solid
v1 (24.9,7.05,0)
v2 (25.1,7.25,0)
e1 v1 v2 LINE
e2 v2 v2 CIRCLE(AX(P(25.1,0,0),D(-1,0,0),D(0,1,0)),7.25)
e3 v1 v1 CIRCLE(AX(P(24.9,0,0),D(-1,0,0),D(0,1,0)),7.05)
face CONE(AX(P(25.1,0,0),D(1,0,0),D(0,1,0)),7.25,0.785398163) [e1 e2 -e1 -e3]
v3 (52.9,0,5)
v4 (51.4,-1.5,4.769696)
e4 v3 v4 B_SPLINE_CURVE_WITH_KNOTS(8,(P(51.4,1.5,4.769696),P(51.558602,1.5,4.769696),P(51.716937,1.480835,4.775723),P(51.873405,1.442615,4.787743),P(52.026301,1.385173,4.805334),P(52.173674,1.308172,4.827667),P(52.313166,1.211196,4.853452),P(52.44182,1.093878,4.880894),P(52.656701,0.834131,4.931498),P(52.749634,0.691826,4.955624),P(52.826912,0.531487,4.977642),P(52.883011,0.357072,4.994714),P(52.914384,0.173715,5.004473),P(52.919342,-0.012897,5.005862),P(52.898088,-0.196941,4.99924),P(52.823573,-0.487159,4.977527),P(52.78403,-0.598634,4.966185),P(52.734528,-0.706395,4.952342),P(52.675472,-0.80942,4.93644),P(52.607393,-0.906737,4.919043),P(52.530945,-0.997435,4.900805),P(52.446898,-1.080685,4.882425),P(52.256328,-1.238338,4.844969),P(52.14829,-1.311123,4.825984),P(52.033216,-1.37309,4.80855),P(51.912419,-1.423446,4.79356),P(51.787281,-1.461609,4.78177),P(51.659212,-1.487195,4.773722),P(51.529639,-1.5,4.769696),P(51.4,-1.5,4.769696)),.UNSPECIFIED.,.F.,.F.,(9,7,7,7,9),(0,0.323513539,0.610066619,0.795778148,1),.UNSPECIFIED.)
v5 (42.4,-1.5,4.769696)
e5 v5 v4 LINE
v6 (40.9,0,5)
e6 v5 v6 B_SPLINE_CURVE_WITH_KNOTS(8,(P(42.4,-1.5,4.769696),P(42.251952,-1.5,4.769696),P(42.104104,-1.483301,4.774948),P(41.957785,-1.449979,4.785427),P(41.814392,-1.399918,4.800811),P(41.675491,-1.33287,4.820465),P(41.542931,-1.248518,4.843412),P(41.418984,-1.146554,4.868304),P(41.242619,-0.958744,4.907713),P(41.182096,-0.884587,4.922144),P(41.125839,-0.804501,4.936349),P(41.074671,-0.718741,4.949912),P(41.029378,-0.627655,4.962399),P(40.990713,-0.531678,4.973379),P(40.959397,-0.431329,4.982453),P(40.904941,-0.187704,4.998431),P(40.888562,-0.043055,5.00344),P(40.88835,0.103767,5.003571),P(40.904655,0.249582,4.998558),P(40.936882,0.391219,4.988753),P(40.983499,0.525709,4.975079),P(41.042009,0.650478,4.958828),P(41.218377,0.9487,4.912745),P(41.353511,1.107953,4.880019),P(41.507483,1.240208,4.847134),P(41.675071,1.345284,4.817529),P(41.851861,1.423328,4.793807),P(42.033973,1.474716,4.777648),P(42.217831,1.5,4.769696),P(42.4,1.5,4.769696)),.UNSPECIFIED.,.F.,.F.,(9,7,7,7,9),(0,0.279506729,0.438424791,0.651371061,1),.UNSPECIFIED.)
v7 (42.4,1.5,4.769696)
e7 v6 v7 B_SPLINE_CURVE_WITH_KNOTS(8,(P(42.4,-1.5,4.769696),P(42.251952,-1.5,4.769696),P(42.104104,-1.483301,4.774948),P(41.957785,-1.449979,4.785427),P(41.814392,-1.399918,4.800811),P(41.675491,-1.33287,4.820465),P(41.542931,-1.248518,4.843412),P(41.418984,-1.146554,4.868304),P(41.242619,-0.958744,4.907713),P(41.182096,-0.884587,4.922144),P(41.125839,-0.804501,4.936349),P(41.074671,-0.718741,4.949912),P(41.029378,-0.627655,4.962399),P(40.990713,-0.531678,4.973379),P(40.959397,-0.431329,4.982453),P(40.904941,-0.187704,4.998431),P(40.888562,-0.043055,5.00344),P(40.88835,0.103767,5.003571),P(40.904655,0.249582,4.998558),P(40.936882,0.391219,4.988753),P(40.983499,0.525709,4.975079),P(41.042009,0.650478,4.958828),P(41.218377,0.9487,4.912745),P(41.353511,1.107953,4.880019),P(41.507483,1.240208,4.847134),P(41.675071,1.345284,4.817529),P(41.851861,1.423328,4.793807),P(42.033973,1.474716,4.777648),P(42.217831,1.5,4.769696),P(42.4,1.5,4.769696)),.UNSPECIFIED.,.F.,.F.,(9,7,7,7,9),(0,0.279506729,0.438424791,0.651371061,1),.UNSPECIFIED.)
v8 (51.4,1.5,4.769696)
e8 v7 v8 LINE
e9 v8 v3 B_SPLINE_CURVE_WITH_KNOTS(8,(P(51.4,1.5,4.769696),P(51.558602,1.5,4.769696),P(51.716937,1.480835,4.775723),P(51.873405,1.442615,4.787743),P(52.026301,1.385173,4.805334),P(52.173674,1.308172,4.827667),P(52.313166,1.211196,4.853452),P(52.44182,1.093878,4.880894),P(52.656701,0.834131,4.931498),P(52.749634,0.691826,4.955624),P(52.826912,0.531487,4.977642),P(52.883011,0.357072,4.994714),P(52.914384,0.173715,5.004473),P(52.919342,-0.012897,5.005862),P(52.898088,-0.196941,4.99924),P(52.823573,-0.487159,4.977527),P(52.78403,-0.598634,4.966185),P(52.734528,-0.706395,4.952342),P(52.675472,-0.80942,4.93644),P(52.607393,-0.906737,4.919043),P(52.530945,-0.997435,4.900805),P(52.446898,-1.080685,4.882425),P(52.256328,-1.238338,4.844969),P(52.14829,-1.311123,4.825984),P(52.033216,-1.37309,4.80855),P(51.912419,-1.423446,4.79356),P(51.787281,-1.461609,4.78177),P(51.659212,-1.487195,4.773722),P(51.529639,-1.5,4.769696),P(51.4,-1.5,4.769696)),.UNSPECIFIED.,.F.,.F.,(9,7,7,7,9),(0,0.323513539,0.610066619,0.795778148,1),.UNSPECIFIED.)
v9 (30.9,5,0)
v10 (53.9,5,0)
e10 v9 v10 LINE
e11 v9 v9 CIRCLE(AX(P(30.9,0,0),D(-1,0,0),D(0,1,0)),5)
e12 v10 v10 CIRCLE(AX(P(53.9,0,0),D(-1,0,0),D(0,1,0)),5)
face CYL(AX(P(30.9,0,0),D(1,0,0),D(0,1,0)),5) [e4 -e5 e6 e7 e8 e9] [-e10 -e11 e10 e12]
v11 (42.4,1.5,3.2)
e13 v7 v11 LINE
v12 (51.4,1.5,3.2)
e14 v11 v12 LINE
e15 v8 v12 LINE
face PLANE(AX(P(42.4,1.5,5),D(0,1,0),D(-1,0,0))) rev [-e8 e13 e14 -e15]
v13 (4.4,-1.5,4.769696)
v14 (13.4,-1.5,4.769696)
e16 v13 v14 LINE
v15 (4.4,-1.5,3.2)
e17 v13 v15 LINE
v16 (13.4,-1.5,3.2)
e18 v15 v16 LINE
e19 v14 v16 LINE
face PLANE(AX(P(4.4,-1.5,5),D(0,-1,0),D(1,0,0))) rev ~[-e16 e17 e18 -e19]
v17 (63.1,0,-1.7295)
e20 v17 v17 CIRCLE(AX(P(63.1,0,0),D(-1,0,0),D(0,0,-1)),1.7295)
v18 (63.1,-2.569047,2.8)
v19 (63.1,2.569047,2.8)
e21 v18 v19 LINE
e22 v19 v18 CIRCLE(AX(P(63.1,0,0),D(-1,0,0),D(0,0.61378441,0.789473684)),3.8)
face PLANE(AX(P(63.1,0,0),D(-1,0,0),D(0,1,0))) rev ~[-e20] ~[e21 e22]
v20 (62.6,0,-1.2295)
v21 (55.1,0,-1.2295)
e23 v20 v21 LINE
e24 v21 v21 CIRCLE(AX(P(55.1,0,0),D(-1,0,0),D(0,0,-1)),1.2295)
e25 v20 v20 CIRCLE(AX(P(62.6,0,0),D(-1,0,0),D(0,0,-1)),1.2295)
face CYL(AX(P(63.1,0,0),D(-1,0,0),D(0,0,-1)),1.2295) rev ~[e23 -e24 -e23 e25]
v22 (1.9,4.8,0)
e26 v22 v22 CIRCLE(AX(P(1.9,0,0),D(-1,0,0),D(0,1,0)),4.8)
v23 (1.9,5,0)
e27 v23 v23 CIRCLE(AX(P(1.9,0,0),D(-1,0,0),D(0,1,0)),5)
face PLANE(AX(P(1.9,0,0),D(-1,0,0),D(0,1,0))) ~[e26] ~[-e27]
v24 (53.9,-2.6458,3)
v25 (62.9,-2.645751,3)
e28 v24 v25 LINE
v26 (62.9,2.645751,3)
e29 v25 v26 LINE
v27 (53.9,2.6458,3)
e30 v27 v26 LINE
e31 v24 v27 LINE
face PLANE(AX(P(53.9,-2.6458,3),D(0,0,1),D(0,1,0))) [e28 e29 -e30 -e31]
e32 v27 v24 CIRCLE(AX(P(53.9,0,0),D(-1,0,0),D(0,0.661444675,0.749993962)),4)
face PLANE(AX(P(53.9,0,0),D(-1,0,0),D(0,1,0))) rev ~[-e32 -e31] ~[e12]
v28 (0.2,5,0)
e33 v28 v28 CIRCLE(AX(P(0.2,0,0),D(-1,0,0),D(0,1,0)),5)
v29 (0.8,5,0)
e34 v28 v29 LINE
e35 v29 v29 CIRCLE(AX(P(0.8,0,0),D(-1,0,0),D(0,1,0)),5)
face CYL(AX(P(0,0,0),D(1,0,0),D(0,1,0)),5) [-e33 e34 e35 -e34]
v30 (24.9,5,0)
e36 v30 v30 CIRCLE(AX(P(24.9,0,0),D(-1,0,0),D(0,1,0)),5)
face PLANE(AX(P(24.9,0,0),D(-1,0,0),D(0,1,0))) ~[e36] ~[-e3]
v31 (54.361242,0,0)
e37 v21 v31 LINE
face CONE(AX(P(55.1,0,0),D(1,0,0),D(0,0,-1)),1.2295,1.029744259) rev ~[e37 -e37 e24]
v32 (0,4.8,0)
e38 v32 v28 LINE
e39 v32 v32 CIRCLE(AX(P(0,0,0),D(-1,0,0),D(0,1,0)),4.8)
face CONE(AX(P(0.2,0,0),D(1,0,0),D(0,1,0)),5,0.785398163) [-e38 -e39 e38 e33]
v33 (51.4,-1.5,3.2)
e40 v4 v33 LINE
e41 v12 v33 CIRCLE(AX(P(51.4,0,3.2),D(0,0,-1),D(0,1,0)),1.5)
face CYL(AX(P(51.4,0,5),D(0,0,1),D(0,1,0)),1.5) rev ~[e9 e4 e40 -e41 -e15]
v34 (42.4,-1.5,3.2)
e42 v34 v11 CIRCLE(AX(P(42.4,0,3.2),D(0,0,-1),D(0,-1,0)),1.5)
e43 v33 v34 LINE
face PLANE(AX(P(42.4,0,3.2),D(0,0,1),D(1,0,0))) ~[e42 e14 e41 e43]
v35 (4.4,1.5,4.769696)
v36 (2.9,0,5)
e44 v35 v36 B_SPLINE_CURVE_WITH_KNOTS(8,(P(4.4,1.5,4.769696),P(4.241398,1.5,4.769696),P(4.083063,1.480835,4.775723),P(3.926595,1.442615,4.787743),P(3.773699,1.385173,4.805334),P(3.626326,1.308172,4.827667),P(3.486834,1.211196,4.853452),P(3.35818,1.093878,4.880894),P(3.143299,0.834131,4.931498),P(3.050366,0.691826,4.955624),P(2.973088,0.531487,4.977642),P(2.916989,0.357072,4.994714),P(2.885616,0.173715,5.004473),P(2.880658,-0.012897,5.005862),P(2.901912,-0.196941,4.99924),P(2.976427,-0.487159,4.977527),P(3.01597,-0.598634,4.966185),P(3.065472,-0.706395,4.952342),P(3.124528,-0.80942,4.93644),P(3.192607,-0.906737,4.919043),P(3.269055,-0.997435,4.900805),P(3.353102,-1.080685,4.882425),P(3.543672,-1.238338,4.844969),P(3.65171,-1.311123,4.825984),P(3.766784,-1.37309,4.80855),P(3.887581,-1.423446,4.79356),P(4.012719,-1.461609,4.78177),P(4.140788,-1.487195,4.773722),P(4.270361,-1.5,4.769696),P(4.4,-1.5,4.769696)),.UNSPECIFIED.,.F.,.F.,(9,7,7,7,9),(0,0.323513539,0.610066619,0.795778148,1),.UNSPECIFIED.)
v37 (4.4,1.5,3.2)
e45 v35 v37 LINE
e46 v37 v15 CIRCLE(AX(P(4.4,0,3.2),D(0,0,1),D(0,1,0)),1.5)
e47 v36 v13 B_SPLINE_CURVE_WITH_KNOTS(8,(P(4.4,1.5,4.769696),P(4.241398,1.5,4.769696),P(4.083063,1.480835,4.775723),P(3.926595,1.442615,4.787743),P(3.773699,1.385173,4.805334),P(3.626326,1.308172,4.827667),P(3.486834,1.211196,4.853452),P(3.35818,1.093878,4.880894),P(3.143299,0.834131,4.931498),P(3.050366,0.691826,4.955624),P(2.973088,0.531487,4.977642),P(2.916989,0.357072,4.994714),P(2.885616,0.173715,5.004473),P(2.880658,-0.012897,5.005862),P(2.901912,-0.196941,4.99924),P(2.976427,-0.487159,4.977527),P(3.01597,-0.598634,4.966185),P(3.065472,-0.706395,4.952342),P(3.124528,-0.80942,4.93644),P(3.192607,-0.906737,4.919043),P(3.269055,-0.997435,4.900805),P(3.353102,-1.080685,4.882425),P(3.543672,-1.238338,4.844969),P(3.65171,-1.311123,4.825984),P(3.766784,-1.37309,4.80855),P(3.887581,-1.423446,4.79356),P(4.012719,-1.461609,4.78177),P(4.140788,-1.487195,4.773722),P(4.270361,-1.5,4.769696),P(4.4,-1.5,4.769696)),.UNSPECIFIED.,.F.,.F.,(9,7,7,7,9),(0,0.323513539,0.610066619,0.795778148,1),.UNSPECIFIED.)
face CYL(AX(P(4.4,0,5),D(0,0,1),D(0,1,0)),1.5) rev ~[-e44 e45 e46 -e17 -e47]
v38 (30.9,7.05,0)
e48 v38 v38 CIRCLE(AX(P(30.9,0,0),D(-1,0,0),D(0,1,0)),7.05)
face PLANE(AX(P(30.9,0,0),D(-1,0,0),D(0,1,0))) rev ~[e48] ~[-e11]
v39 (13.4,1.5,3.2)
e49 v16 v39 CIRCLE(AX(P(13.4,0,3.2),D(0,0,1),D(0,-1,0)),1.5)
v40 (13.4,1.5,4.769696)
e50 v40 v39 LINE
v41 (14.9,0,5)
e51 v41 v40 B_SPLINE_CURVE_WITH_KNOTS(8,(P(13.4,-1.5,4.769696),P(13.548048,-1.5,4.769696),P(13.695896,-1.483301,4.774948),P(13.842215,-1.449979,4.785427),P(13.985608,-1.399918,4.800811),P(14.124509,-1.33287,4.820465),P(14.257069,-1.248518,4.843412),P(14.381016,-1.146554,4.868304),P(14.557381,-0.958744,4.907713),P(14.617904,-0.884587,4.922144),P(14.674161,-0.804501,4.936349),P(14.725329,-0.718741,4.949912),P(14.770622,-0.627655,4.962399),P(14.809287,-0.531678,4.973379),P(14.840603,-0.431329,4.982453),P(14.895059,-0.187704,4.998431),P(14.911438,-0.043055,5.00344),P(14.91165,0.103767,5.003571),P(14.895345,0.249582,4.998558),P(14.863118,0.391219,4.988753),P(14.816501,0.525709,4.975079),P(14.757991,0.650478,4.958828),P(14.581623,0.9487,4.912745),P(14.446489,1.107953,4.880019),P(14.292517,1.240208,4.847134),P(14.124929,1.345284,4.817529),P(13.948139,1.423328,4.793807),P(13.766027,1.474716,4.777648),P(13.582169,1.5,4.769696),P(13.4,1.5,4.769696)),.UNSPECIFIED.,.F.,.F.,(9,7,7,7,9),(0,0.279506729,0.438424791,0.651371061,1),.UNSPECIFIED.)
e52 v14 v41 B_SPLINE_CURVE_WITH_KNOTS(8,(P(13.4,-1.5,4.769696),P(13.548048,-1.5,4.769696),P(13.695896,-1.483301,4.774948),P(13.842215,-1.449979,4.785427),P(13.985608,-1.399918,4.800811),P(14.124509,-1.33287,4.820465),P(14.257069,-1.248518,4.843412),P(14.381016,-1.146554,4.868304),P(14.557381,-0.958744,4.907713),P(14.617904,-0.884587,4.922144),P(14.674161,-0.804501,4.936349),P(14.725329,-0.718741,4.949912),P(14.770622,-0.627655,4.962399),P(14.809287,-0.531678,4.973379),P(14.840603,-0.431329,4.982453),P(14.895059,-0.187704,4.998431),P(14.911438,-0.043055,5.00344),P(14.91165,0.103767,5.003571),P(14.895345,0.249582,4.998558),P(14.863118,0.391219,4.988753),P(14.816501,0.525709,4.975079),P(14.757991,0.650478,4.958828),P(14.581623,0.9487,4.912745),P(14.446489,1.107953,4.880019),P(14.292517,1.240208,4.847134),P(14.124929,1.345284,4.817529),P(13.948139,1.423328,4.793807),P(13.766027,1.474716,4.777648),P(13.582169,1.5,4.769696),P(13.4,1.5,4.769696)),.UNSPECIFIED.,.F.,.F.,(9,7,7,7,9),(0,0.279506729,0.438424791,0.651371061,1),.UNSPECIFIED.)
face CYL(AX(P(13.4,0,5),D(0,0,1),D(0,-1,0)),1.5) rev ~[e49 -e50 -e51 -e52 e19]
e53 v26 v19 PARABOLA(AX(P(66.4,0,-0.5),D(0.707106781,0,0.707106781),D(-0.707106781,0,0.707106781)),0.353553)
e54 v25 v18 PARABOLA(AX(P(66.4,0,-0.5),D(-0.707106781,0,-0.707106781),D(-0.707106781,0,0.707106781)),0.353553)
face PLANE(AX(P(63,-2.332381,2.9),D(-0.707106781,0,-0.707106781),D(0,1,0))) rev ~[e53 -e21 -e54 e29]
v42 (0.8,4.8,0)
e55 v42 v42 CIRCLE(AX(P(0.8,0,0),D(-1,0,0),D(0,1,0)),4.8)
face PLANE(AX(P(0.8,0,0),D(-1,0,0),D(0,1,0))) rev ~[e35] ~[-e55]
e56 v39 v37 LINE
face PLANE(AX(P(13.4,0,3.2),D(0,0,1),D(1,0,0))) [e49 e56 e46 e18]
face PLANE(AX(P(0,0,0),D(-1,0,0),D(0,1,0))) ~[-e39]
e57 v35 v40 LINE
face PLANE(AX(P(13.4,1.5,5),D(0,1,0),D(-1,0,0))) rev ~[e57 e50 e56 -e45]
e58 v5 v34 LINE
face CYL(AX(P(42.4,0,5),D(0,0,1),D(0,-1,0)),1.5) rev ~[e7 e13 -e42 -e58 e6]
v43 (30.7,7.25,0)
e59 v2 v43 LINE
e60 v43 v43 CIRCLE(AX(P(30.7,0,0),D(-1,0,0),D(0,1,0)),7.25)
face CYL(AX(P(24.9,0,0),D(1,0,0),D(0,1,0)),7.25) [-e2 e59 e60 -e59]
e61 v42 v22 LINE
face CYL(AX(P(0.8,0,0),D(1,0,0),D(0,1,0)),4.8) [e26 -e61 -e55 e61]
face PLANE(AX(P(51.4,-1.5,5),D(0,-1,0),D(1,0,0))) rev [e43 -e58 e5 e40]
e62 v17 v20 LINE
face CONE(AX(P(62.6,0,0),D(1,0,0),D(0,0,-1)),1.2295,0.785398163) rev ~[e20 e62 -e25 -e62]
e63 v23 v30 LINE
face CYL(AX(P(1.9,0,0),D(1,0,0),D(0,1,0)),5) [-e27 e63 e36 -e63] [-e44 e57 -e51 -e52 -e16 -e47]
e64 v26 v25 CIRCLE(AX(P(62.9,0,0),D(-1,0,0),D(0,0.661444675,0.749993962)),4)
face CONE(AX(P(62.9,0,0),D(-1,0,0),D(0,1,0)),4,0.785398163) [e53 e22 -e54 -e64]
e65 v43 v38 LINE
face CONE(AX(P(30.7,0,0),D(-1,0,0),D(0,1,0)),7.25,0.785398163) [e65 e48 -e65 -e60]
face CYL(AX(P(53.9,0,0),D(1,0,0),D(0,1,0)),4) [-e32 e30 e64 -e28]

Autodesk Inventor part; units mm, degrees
ref_plane "YZ Plane" through (0, 0, 0) normal (1, 0, 0) x (0, 1, 0)
ref_plane "XZ Plane" through (0, 0, 0) normal (0, 1, 0) x (-1, 0, 0)
sketch "Skizze1" plane through (0, 0, 0) normal (0, 0, 1) x (1, 0, 0)
  line L0 (0, 0) -> (0, 5)
  line L1 (0, 5) -> (0.8, 5)
  line L2 (0.8, 5) -> (0.8, 4.8)
  line L3 (0.8, 4.8) -> (1.9, 4.8)
  line L4 (1.9, 4.8) -> (1.9, 5)
  line L5 (1.9, 5) -> (24.9, 5)
  line L6 (24.9, 5) -> (24.9, 7.25)
  line L7 (24.9, 7.25) -> (30.9, 7.25)
  line L8 (30.9, 7.25) -> (30.9, 5)
  line L9 (30.9, 5) -> (53.9, 5)
  line L10 (53.9, 5) -> (53.9, 4)
  line L11 (53.9, 4) -> (63.1, 4)
  line L12 (63.1, 4) -> (63.1, 0)
  line L13 (63.1, 0) -> (0, 0)
  line L14 (15.9, 5) -> (15.9, 0) construction
  line L15 (39.9, 5) -> (39.9, 0) construction
  line L16 (9.9, 5) -> (9.9, 0) construction
  line L17 (45.9, 5) -> (45.9, 0) construction
  line L18 (53.9, 5) -> (53.9, 0) construction
  dimension "d0" = 10
  dimension "d2" = 14.5
  dimension "d3" = 1.1
  dimension "d4" = 9.6
  dimension "d5" = 0.8
  dimension "d7" = 9
  dimension "d8" = 9
  dimension "d9" = 6
  dimension "d10" = 14
  dimension "d11" = 14
  dimension "ParrallelMecha_DrivenLink_OuterWidth" = 52
  dimension "d22" = 6
  dimension "d23" = 6
  dimension "Querstrebe_Length" = 36
  dimension "d25" = 9.2
  dimension "d26" = 8
revolve "Umdrehung1" add sketch "Skizze1" angle 360 about axis through (63.1, 0, 0) along (-1, 0, 0)
chamfer "Fase1" distance 0.2 angle 45 4 edges at (24.9, -7.25, 0) (30.9, -7.25, 0) (63.1, -4, 0) (0, -5, 0)
ref_plane "Wellennut_Spiegelebene" through (27.9, 0, 0) normal (-1, 0, 0) x (0, 0, 1)
ref_plane "Arbeitsebene2" through (13.4, 0, 5) normal (0, 0, 1) x (1, 0, 0)
sketch "Skizze3" plane through (13.4, 0, 5) normal (0, 0, 1) x (1, 0, 0)
  line L0 (2.5, 5) -> (2.5, 0) construction
  line L1 (-26.02, 0) -> (62.32, 0) construction
  line L2 (0, 0) -> (-9, 0) construction
  line L3 (0, 1.5) -> (-9, 1.5)
  line L4 (-9, -1.5) -> (0, -1.5)
  arc A0 (0, -1.5) -> (0, 1.5) centre (0, 0) ccw
  arc A1 (-9, 1.5) -> (-9, -1.5) centre (-9, 0) ccw
  line L5 (-11.5, 0) -> (2.5, 0) construction
  line L6 (-11.5, -5) -> (-11.5, 5) construction
  point P0 (-13.4, 0)
  point P1 (-4.5, 0)
  point P2 (-4.5, 0)
  dimension "d17" = 3
  dimension "d18" = 12
extrude "Wellennut" cut sketch "Skizze3" against normal blind 1.8
mirror "Spiegeln1" about plane through (27.9, 0, 0) normal (-1, 0, 0) of "Wellennut"
sketch "Skizze4" plane through (53.9, 0, 0) normal (1, 0, 0) x (0, 0, -1)
  circle A0 centre (0, 0) radius 4 projected
  line L0 (-3, -2.6458) -> (-3, 2.6458)
  point P0 (0, 0)
  dimension "d27" = 3
extrude "Extrusion2" cut sketch "Skizze4" along normal through all contours L0 A0 picked at (-3.1815, -0.6179)
chamfer "Fase2" distance 0.2 angle 45 1 edges at (63.1, 0, 3)
sketch "Skizze5" plane through (63.1, 0, 0) normal (1, 0, 0) x (0, 0, -1)
  arc A0 (-3, -2.6458) -> (-3, 2.6458) centre (0, 0) ccw construction
  circle A1 centre (0, 0) radius 5 construction
  point P0 (0, 0)
hole "Bohrung1" at (63.1, 0, 0) direction (-1, 0, 0) diameter 2.459 depth 8 tip angle 118 thread size "M3x0.5" class "6H" standard "ISO Metric profile"
chamfer "Fase3" distance 0.5 angle 45 1 edges at (63.1, 0, 1.2295)
equation "\"d10\" = ParallelLink_Lever_Thickness + ParallelMecha_Bearing_Step_Thickness"
equation "\"d11\" = d10"
equation "\"d22\" = ParallelMecha_Bearing_Step_Thickness"
equation "\"d23\" = d22"
equation "\"d26\" = CapstonV2_ShaftDia"
equation "\"d27\" = 0.5 * CapstonV2_ShaftDia - Poligonprofil_Ausnehmung"
equation "\"ParallelLink_Lever_Thickness\" = 8"
equation "\"ParallelMecha_Bearing_Step_Thickness\" = 6"
equation "\"CapstonV2_ShaftDia\" = 8"
equation "\"Poligonprofil_Ausnehmung\" = 1"
properties part number "ParallelSystem_ProximalPart_Shaft_Driven_Rillenkugellager" material "Edelstahl"
